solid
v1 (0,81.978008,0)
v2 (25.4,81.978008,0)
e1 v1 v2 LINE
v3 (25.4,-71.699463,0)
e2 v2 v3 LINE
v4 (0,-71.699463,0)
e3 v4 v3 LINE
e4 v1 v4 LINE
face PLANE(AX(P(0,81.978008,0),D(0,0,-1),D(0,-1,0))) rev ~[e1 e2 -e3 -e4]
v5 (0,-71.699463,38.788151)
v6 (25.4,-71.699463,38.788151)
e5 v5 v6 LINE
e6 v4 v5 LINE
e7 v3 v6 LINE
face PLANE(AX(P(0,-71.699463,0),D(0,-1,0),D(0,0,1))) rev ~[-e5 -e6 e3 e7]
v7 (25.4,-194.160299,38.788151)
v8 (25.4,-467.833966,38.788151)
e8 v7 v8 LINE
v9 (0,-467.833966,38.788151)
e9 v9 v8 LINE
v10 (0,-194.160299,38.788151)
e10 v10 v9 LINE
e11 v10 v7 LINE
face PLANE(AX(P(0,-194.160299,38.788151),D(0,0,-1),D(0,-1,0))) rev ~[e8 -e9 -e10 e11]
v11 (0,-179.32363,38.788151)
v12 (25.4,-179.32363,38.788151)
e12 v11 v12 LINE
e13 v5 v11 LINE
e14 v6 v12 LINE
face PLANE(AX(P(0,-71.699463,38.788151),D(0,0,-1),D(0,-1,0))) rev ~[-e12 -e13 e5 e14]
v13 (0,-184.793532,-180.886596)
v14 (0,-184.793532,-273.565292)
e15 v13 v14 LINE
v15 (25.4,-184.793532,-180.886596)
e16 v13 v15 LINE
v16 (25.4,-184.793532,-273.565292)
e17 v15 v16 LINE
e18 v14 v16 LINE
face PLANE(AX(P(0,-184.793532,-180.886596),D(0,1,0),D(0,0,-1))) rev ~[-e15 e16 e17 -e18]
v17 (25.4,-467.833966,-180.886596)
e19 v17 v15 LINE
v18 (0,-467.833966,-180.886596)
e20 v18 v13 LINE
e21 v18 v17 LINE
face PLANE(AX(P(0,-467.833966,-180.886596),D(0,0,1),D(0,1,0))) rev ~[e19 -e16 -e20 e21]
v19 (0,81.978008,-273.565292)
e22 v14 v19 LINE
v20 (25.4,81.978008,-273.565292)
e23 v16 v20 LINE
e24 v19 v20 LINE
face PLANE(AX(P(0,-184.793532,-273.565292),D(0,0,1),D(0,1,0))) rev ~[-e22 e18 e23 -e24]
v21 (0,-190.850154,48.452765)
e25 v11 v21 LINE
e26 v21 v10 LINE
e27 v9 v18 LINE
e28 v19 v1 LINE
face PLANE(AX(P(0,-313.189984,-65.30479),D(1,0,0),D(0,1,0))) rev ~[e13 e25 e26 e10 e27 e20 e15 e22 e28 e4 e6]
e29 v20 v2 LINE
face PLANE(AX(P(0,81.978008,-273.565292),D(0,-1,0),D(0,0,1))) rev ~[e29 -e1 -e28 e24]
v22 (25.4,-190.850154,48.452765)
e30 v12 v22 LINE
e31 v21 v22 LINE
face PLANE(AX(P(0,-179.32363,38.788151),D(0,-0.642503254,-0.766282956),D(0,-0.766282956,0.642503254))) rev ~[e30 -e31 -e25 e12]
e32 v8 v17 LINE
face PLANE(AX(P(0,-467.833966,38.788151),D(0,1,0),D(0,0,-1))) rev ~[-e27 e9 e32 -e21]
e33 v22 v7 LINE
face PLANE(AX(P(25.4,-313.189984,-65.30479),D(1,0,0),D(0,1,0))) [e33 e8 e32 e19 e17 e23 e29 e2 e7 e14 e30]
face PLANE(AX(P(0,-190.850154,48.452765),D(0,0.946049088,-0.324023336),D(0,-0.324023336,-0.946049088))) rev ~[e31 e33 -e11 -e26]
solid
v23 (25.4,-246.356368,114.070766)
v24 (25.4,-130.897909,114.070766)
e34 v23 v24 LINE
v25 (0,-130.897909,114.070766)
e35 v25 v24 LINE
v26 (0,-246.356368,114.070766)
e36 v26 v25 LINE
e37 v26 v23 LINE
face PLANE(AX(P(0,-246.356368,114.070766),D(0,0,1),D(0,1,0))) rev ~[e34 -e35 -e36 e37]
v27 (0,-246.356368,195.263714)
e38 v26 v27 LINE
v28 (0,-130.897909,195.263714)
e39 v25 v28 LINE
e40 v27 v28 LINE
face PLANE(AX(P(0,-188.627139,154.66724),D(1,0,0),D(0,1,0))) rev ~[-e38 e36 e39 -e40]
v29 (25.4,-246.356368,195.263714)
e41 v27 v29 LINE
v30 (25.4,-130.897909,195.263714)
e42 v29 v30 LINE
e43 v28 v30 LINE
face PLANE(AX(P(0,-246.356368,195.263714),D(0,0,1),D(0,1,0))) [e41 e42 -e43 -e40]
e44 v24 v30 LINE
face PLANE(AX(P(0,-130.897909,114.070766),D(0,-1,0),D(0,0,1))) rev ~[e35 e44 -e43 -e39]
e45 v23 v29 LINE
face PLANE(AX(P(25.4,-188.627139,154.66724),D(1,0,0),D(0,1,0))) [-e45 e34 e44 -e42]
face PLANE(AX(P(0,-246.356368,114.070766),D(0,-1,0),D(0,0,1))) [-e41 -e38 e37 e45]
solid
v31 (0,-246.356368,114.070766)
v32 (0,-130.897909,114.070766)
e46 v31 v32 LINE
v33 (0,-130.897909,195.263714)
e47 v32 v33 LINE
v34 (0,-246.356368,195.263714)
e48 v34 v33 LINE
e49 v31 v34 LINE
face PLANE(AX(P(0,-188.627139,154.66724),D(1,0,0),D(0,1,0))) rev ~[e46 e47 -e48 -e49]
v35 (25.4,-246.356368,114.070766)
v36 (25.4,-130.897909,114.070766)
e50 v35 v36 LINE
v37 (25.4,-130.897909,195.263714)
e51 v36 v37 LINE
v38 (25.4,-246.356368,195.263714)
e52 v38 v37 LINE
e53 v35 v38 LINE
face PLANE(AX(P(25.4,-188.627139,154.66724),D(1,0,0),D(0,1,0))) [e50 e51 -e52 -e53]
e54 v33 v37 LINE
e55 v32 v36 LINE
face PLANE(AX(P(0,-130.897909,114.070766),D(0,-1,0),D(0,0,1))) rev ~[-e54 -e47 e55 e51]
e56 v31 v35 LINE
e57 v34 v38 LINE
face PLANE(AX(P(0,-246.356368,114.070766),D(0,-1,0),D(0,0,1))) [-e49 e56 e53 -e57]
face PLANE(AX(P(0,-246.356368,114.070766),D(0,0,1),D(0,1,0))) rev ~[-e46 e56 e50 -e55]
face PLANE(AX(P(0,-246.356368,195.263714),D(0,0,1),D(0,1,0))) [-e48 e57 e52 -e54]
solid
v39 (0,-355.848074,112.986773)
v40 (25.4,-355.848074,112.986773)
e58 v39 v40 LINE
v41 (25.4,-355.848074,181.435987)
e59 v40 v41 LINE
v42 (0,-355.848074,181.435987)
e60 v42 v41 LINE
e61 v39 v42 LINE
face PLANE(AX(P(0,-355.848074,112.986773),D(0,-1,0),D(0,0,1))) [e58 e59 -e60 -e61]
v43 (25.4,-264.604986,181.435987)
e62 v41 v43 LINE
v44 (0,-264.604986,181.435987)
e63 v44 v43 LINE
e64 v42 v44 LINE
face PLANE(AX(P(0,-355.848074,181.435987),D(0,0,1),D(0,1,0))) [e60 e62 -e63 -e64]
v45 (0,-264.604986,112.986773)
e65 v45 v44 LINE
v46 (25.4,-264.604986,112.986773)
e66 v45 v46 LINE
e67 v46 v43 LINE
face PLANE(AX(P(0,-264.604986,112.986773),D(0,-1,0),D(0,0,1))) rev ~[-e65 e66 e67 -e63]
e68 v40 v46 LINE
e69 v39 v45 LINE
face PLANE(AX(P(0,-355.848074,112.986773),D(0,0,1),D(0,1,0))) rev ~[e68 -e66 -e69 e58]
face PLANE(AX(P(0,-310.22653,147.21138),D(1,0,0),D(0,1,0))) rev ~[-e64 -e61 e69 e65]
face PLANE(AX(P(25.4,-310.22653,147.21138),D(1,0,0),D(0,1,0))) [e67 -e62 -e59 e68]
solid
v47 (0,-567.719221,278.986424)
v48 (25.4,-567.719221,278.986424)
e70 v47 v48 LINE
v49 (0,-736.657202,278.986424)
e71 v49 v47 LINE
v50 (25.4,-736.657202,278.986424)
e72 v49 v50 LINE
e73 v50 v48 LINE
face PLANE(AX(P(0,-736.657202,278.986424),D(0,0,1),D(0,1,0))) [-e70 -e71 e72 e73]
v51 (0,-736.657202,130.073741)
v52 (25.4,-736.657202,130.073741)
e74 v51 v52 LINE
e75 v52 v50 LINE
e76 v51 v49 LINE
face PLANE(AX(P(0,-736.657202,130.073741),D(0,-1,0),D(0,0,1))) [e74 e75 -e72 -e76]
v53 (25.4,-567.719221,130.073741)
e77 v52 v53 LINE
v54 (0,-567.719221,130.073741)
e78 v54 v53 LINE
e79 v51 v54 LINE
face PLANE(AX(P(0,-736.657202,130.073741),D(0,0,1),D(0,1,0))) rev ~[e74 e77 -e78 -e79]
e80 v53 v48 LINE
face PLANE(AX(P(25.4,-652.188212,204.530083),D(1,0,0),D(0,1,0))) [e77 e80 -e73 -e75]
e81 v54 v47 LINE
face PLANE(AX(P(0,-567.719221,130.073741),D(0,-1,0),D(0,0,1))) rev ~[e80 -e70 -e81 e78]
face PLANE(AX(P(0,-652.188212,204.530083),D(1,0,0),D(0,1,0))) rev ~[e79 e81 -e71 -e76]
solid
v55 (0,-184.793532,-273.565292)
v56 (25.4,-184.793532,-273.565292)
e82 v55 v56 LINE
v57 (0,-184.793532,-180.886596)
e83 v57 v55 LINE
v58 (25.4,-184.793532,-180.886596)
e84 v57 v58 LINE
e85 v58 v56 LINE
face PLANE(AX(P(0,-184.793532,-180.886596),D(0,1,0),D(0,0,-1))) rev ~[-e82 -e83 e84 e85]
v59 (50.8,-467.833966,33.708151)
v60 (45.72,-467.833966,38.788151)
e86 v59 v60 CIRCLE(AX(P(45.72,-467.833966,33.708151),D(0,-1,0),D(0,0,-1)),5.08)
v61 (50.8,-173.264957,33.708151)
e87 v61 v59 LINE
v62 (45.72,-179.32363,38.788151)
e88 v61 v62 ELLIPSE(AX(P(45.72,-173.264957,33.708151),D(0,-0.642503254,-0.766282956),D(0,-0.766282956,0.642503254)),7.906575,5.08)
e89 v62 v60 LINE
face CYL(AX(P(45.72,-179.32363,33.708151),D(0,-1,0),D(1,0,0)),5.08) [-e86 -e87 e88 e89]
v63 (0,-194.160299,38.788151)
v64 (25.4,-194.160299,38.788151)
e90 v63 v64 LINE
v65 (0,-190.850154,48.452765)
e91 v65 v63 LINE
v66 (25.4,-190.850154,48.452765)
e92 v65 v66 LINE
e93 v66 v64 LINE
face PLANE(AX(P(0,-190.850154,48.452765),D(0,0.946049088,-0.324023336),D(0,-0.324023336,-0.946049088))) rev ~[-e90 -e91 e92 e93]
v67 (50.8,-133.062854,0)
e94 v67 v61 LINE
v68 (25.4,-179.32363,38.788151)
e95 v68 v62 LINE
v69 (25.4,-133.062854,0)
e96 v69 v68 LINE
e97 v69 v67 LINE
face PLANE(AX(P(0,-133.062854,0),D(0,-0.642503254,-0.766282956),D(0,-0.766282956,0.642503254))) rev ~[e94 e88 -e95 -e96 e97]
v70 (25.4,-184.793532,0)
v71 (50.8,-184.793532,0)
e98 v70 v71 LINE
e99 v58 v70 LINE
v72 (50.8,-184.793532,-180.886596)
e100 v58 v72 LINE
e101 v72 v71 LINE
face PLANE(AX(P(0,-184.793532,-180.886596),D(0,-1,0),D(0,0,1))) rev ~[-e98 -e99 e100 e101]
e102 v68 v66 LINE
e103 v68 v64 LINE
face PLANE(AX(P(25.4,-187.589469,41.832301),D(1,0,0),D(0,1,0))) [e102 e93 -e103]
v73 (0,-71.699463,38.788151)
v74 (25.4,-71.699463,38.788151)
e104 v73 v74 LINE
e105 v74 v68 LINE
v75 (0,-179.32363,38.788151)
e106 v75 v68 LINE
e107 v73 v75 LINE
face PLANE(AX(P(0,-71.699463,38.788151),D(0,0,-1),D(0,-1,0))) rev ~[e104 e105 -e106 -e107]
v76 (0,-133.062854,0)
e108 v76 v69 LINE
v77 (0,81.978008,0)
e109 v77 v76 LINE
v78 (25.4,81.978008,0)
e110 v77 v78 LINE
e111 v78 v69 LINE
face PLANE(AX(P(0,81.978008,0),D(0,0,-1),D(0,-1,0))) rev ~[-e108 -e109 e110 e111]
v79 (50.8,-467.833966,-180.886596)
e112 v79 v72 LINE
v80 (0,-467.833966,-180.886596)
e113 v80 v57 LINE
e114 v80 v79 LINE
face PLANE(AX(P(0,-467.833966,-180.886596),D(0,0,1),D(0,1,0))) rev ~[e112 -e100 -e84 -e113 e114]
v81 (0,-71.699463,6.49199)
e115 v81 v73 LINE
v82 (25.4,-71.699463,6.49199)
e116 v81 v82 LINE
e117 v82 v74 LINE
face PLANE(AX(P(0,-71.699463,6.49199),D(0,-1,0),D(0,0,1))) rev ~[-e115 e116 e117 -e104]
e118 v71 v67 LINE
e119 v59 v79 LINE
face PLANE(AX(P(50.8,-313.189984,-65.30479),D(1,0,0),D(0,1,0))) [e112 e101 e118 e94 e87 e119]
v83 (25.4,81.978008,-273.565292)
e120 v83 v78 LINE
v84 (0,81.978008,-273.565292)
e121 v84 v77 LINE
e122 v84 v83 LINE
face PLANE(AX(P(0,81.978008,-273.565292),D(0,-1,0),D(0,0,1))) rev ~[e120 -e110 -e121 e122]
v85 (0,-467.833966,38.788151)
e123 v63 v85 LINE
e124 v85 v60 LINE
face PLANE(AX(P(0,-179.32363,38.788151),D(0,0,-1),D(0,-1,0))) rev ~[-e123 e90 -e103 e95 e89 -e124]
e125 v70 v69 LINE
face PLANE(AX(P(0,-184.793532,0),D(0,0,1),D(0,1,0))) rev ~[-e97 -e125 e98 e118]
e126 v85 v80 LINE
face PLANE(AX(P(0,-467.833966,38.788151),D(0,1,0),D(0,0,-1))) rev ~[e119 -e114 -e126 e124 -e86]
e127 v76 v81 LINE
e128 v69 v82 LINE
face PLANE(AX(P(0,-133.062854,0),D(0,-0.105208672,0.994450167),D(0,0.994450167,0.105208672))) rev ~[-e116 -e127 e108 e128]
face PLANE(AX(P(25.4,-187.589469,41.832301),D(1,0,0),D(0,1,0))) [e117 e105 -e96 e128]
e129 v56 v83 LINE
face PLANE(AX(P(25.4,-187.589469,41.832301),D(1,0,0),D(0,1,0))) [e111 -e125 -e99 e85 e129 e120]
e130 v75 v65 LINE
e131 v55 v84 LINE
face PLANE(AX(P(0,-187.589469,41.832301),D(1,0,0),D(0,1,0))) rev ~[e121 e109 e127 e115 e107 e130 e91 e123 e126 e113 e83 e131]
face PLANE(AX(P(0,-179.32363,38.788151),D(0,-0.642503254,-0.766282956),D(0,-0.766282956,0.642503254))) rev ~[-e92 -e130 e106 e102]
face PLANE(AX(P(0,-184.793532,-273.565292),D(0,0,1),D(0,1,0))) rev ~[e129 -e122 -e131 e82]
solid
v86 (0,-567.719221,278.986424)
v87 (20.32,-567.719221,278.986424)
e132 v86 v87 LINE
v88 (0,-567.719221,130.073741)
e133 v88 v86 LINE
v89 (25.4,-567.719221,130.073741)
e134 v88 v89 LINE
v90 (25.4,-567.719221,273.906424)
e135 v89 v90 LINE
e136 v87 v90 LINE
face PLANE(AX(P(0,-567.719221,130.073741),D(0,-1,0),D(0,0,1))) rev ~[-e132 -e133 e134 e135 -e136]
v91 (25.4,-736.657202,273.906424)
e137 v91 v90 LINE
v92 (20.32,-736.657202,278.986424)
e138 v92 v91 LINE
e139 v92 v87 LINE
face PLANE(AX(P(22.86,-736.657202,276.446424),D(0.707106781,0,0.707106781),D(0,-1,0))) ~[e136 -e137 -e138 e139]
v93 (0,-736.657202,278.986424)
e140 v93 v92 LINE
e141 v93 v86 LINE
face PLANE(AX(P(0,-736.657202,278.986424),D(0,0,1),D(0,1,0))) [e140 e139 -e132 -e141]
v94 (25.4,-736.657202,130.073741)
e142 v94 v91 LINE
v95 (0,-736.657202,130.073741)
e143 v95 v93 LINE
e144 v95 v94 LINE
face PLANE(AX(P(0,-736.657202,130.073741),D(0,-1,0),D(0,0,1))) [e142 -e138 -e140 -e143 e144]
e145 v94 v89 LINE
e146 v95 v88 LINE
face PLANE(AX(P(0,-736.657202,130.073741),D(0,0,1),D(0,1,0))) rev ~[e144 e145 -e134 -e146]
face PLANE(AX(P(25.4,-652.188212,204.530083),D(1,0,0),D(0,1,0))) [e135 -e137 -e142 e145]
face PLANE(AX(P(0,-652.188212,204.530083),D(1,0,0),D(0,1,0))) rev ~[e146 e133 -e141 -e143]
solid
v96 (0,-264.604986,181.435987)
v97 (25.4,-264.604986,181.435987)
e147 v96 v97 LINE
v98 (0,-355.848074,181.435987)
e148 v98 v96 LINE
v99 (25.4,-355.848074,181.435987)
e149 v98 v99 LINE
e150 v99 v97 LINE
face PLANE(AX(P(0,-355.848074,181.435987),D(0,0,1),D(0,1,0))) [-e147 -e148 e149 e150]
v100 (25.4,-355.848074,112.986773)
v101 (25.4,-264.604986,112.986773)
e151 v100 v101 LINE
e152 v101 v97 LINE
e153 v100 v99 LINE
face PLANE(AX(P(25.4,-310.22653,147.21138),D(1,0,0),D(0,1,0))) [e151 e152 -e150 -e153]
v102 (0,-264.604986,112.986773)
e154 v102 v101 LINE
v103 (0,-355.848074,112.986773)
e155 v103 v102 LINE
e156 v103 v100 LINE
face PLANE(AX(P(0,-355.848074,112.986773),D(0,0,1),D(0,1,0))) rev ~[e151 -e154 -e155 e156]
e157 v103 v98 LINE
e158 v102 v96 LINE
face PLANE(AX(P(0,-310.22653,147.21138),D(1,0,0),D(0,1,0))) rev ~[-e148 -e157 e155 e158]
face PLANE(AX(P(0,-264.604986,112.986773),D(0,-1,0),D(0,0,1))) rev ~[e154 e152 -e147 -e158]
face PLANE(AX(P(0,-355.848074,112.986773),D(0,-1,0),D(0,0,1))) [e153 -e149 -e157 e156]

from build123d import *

# Parameters (mm, degrees)
F1_DEPTH = 50.8
F0_W     = 91.2430882454
F0_H     = 68.4492141008
F2_DEPTH = 25.4
F0_W_2   = 115.458458662
F0_H_2   = 81.1929479241
F0_W_3   = 168.9379811287
F0_H_3   = 148.9126831293
F3_DEPTH = 25.4
F5_R     = 5.08
F6_SIZE  = 5.08


# Not quite as in the source:
# - a feature names something its author has since deleted; it is built from what else it names


with BuildPart() as f1:
    # F0 (on Right) → F1 (new body)
    with BuildSketch(Plane.YZ):
        Polygon((-179.3236301752, 38.788150996), (-194.1602993403, 38.788150996), (-467.8339660168, 38.788150996), (-467.8339660168, -180.8865964413), (-184.7935318947, -180.8865964413), (-184.7935318947, 0), (-133.0628544092, 0), align=None)
    extrude(amount=F1_DEPTH)

    # F0 (on Right) → F2, piece 4 (join)
    with BuildSketch(Plane.YZ):
        Polygon((-190.8501535654, 48.4527647495), (-194.1602993403, 38.788150996), (-179.3236301752, 38.788150996), align=None)
        Polygon((-71.699462831, 38.788150996), (-179.3236301752, 38.788150996), (-133.0628544092, 0), (-71.699462831, 6.4919903721), align=None)
        Polygon((-71.699462831, 0), (-133.0628544092, 0), (-184.7935318947, 0), (-184.7935318947, -180.8865964413), (-71.699462831, -180.8865964413), align=None)
        Polygon((-179.3236301752, 38.788150996), (-194.1602993403, 38.788150996), (-467.8339660168, 38.788150996), (-467.8339660168, -180.8865964413), (-184.7935318947, -180.8865964413), (-184.7935318947, 0), (-133.0628544092, 0), align=None)
        Polygon((-71.699462831, -180.8865964413), (-184.7935318947, -180.8865964413), (-184.7935318947, -273.5652923584), (81.9780081511, -273.5652923584), (81.9780081511, 0), (-71.699462831, 0), align=None)
    extrude(amount=F2_DEPTH)

    # F5
    f5_edges = [f1.edges().sort_by_distance(p)[0] for p in [
        (50.8, -323.578798, 38.788151),
    ]]
    fillet(f5_edges, radius=F5_R)


with BuildPart() as f2:
    # F0 (on Right) → F2 (new body)
    with BuildSketch(Plane.YZ):
        with Locations((-310.2265298367, 147.2113803029)):
            Rectangle(F0_W, F0_H)
    extrude(amount=F2_DEPTH)


with BuildPart() as f2b:
    # F0 (on Right) → F2, piece 2 (new body)
    with BuildSketch(Plane.YZ):
        with Locations((-188.6271387339, 154.6672396362)):
            Rectangle(F0_W_2, F0_H_2)
    extrude(amount=F2_DEPTH)


with BuildPart() as f2c:
    # F0 (on Right) → F2, piece 3 (new body)
    with BuildSketch(Plane.YZ):
        with Locations((-652.1882116795, 204.530082643)):
            Rectangle(F0_W_3, F0_H_3)
    extrude(amount=F2_DEPTH)

    # F6
    f6_edges = [f2c.edges().sort_by_distance(p)[0] for p in [
        (25.4, -652.188212, 278.986424),
    ]]
    chamfer(f6_edges, length=F6_SIZE)


with BuildPart() as f3:
    # F0 (on Right) → F3 (new body)
    with BuildSketch(Plane.YZ):
        Polygon((-179.3236301752, 38.788150996), (-194.1602993403, 38.788150996), (-467.8339660168, 38.788150996), (-467.8339660168, -180.8865964413), (-184.7935318947, -180.8865964413), (-184.7935318947, 0), (-133.0628544092, 0), align=None)
        Polygon((-190.8501535654, 48.4527647495), (-194.1602993403, 38.788150996), (-179.3236301752, 38.788150996), align=None)
        Polygon((-71.699462831, 38.788150996), (-179.3236301752, 38.788150996), (-133.0628544092, 0), (-71.699462831, 6.4919903721), align=None)
        Polygon((-71.699462831, 0), (-133.0628544092, 0), (-184.7935318947, 0), (-184.7935318947, -180.8865964413), (-71.699462831, -180.8865964413), align=None)
        Polygon((-71.699462831, 6.4919903721), (-133.0628544092, 0), (-71.699462831, 0), align=None)
        Polygon((-71.699462831, -180.8865964413), (-184.7935318947, -180.8865964413), (-184.7935318947, -273.5652923584), (81.9780081511, -273.5652923584), (81.9780081511, 0), (-71.699462831, 0), align=None)
    extrude(amount=F3_DEPTH)


with BuildPart() as f3b:
    # F0 (on Right) → F3, piece 2 (new body)
    with BuildSketch(Plane.YZ):
        with Locations((-310.2265298367, 147.2113803029)):
            Rectangle(F0_W, F0_H)
    extrude(amount=F3_DEPTH)


with BuildPart() as f3c:
    # F0 (on Right) → F3, piece 3 (new body)
    with BuildSketch(Plane.YZ):
        with Locations((-188.6271387339, 154.6672396362)):
            Rectangle(F0_W_2, F0_H_2)
    extrude(amount=F3_DEPTH)


with BuildPart() as f3d:
    # F0 (on Right) → F3, piece 4 (new body)
    with BuildSketch(Plane.YZ):
        with Locations((-652.1882116795, 204.530082643)):
            Rectangle(F0_W_3, F0_H_3)
    extrude(amount=F3_DEPTH)


solid = Compound([f1.part, f2.part, f2b.part, f2c.part, f3.part, f3b.part, f3c.part, f3d.part])
